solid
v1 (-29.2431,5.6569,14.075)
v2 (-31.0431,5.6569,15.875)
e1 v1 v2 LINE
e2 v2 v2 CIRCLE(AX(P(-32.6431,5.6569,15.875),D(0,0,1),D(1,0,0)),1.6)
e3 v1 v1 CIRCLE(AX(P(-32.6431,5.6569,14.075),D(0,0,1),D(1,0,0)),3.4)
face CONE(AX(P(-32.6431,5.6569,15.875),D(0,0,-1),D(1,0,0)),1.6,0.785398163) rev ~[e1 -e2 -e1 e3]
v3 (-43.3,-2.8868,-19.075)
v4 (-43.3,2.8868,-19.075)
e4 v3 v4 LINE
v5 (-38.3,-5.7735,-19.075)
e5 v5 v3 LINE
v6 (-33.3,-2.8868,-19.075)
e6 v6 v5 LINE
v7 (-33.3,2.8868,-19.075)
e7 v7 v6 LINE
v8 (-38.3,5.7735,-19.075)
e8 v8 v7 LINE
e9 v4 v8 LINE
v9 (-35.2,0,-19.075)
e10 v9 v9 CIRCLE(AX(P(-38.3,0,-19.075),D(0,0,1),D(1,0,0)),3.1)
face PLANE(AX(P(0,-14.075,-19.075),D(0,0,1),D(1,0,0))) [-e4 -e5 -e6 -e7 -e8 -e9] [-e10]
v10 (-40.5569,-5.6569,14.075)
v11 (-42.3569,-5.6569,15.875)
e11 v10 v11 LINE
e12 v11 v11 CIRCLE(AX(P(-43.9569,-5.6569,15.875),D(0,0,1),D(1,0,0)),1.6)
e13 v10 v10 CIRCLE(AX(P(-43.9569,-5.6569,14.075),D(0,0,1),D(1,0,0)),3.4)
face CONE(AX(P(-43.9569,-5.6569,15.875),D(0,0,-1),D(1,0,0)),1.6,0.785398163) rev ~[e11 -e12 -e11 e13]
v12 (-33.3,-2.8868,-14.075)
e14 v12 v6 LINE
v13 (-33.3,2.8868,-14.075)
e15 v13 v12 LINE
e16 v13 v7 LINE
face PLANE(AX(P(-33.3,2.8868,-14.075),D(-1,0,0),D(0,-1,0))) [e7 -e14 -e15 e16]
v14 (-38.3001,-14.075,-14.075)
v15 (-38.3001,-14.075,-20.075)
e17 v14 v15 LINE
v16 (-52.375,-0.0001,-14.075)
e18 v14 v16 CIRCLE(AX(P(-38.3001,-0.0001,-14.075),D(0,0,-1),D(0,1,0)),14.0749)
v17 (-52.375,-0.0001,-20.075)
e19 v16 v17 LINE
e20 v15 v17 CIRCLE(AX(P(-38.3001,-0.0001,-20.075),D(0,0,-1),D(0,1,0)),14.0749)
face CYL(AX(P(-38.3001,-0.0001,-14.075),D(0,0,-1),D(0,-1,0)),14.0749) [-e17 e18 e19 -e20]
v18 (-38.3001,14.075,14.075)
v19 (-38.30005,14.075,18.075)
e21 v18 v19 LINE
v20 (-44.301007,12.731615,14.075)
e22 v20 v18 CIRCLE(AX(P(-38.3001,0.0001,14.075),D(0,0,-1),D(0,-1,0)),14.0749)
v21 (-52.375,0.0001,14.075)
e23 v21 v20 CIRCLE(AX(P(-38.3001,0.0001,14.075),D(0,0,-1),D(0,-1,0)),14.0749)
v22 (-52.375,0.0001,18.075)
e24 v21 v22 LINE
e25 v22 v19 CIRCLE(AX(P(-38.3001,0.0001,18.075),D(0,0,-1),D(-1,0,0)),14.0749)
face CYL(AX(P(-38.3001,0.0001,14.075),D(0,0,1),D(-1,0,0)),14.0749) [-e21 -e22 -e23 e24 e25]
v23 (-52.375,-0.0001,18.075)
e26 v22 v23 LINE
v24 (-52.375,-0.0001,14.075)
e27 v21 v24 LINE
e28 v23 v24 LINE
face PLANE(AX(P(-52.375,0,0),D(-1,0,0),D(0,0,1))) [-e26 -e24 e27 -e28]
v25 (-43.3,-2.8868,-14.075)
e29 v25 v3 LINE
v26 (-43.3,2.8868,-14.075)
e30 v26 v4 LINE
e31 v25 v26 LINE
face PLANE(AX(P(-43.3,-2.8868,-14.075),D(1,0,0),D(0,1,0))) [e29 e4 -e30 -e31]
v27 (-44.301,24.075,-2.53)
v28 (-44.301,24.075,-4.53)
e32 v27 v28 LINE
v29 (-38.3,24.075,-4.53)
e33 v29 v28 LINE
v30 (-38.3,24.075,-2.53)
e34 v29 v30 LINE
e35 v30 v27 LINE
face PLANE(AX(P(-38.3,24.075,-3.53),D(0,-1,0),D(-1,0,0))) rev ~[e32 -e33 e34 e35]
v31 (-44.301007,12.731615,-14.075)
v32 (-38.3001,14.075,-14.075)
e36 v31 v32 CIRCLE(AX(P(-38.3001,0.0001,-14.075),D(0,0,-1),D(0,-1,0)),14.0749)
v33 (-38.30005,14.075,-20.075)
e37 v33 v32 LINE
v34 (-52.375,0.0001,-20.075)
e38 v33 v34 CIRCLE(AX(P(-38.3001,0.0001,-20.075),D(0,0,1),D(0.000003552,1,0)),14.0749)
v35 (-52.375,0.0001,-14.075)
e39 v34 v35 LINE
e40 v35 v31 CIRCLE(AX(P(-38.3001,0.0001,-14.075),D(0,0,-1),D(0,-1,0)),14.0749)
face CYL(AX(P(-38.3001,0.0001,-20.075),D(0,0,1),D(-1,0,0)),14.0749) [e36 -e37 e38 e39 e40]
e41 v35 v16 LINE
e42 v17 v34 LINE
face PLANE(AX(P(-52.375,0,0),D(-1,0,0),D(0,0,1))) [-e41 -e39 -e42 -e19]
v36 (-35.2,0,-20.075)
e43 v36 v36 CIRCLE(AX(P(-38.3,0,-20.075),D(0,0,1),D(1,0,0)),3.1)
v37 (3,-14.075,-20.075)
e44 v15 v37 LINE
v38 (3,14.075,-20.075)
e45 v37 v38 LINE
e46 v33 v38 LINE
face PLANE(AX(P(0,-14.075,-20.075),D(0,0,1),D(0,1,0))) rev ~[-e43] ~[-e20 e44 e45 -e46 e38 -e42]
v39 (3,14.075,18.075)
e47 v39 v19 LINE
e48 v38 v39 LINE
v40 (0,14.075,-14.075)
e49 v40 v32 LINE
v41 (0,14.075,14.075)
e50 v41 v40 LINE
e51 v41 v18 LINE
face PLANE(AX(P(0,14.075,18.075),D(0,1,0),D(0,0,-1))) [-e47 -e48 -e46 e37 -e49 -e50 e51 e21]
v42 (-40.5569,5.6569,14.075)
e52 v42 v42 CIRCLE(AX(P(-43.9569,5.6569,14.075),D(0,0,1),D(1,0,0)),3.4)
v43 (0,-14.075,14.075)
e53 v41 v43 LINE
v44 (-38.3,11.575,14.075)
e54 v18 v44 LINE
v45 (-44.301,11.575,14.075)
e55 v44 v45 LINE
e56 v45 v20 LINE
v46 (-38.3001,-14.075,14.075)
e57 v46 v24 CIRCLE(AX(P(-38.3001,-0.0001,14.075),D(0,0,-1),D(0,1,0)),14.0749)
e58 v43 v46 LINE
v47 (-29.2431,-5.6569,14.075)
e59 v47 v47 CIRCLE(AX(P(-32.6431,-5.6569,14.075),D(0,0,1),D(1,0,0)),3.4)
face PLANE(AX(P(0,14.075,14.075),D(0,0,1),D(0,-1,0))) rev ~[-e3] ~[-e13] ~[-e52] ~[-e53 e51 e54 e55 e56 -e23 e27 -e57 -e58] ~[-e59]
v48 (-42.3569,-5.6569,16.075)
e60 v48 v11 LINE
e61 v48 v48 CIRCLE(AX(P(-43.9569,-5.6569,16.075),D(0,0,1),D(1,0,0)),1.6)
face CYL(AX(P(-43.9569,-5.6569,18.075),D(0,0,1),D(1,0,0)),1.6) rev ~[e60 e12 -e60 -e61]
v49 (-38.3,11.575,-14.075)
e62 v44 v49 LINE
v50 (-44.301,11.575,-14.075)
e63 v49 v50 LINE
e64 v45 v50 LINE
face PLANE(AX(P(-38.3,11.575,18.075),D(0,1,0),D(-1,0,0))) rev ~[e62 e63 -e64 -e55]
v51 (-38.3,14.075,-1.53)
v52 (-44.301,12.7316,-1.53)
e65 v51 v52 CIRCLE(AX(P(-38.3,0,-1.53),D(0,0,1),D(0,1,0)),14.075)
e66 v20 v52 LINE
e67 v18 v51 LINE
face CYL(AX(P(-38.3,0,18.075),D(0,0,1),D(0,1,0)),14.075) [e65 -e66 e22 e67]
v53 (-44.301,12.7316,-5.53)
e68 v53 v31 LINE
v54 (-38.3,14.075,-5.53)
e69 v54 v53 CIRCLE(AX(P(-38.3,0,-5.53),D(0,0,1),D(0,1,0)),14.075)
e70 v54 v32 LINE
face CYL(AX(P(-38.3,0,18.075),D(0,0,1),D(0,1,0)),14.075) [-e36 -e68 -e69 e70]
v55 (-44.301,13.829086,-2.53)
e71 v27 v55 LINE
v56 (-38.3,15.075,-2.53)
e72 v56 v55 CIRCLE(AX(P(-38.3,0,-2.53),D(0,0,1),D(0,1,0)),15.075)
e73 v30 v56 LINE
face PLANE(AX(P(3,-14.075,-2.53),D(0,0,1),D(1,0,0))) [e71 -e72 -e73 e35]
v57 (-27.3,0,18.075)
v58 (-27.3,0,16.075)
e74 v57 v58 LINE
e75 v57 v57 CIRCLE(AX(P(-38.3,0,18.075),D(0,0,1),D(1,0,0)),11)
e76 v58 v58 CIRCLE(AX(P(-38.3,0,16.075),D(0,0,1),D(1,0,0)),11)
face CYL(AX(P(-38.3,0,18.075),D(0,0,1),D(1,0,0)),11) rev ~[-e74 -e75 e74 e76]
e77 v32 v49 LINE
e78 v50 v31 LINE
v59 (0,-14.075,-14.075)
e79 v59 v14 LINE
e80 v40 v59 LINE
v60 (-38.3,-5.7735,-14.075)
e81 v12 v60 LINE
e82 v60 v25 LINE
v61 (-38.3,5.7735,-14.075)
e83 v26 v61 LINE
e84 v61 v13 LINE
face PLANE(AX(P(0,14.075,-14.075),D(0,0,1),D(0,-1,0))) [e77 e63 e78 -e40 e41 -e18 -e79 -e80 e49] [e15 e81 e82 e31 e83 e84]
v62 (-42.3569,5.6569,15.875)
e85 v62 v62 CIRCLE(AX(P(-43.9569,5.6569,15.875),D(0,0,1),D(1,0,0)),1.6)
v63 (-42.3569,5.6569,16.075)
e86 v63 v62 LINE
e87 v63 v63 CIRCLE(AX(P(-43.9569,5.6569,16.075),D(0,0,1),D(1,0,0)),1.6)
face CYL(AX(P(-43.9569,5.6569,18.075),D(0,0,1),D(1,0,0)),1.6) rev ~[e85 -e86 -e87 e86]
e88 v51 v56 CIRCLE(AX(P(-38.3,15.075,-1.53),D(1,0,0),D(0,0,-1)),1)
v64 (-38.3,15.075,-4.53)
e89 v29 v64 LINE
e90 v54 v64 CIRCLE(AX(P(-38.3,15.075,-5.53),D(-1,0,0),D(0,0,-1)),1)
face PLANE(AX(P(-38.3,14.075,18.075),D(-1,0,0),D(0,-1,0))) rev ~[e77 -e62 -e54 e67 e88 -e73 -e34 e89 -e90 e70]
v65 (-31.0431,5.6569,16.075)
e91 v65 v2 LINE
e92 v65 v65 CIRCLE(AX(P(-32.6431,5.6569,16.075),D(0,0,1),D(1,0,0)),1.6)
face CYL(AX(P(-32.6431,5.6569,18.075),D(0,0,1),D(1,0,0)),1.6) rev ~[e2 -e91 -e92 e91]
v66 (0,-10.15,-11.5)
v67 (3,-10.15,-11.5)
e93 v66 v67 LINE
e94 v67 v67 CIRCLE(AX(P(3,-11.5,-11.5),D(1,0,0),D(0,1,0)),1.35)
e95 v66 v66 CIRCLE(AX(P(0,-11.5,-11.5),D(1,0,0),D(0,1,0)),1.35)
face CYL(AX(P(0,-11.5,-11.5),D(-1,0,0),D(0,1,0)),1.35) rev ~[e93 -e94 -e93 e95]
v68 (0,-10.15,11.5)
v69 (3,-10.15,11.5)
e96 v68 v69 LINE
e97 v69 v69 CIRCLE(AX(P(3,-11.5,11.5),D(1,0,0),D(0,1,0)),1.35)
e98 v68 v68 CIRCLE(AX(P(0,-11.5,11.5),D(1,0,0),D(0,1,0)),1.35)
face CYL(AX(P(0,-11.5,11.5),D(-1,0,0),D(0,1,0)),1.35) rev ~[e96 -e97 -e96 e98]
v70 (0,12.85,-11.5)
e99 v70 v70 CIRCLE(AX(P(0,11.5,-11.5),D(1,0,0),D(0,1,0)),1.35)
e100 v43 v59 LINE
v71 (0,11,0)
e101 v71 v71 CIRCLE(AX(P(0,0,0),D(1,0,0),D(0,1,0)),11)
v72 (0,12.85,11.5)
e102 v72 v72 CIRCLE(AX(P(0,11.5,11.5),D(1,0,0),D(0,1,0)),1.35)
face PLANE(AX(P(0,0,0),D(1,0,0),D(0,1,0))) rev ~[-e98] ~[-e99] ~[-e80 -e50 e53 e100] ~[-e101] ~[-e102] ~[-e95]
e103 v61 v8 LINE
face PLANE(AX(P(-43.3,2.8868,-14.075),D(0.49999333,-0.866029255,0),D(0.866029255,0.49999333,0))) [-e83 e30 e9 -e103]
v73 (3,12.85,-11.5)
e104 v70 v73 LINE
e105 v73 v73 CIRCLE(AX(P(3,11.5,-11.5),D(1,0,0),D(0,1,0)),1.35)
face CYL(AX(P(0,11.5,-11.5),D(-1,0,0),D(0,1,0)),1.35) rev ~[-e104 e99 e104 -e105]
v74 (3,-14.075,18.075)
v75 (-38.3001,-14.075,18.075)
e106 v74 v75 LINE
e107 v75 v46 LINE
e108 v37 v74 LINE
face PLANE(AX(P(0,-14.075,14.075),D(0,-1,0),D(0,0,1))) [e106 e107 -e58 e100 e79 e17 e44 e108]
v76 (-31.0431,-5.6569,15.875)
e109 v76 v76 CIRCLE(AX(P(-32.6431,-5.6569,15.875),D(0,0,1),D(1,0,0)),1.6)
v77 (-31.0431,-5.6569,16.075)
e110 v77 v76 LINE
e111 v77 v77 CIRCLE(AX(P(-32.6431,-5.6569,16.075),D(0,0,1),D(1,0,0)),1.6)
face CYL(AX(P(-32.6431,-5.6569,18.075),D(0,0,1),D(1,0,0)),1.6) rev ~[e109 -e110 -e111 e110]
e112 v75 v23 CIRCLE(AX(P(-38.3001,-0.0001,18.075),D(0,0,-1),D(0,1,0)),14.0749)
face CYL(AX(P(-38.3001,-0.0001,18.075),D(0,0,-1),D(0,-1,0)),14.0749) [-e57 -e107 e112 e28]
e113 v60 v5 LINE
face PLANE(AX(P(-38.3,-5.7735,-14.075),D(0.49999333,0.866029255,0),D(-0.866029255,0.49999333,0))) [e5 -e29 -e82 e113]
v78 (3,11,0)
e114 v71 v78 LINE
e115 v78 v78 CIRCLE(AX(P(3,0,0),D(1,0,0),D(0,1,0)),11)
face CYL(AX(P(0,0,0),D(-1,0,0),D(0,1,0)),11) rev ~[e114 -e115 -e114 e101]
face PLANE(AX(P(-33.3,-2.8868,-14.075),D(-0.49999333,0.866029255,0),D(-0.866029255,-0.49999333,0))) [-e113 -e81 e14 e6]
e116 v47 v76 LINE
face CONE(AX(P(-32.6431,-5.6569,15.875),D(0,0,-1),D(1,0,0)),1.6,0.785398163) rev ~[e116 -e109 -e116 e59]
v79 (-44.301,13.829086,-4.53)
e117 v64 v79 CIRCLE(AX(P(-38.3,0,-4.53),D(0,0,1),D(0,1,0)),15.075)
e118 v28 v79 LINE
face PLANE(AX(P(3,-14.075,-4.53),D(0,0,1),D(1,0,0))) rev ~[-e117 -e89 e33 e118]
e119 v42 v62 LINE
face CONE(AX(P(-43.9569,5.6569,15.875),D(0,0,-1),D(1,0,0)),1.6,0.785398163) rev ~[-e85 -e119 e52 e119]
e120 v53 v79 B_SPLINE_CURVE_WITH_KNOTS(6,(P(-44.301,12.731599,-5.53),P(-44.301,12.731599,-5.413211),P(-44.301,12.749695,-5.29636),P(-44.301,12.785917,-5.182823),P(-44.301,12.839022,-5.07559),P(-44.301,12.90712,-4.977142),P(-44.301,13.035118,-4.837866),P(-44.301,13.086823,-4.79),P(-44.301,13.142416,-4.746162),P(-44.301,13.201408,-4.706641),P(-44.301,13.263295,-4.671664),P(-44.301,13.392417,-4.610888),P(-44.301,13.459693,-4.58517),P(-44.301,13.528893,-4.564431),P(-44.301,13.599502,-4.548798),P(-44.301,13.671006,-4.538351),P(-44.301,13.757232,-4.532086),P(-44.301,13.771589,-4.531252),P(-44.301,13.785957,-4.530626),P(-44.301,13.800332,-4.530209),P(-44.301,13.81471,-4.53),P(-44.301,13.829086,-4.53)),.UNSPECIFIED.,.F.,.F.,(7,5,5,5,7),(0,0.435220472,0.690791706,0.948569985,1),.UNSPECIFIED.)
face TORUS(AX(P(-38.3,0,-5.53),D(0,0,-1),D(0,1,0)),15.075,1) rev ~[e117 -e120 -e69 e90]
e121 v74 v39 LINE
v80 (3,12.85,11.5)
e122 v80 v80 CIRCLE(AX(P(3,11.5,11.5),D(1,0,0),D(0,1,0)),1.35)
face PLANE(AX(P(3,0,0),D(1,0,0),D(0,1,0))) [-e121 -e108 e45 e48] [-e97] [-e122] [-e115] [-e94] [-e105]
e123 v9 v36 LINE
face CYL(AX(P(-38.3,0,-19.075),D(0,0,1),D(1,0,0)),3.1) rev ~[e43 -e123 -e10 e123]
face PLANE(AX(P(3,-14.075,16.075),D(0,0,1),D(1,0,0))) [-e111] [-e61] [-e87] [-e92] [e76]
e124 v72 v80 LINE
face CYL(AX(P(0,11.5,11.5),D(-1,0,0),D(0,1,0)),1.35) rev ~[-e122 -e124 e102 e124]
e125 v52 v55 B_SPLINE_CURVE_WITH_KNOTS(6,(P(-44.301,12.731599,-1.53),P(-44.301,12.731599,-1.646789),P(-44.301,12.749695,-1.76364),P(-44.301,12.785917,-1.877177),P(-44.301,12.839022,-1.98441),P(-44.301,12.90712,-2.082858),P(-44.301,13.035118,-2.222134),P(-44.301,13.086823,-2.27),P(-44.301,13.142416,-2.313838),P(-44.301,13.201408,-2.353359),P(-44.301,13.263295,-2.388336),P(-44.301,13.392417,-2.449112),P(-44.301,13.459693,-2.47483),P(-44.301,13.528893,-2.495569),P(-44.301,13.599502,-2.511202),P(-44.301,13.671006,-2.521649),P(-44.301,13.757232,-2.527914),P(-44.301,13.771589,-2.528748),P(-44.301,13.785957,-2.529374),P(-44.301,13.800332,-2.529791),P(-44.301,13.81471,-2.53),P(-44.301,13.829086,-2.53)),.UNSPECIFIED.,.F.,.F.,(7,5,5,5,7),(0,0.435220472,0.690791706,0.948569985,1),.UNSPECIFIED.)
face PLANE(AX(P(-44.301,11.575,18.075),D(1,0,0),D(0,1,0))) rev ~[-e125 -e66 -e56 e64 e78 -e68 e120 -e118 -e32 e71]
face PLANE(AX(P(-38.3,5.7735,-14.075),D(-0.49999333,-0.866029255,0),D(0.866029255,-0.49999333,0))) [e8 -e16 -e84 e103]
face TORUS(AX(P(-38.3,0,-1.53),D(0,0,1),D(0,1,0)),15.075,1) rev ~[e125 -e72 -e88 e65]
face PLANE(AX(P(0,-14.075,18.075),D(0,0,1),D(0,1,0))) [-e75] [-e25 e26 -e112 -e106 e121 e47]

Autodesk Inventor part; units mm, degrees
ref_plane "YZ Plane" through (0, 0, 0) normal (1, 0, 0) x (0, 1, 0)
ref_plane "XZ Plane" through (0, 0, 0) normal (0, 1, 0) x (-1, 0, 0)
sketch "草圖1" plane through (0, 0, 0) normal (1, 0, 0) x (0, 1, 0)
  line L0 (-14.075, 14.075) -> (14.075, 14.075)
  line L1 (14.075, 14.075) -> (14.075, -14.075)
  line L2 (14.075, -14.075) -> (-14.075, -14.075)
  line L3 (-14.075, -14.075) -> (-14.075, 14.075)
  line L4 (-14.075, 14.075) -> (14.075, -14.075) construction
  line L5 (14.075, 14.075) -> (-14.075, -14.075) construction
  line L6 (14.075, 14.075) -> (-14.075, 14.075)
  line L7 (-14.075, 14.075) -> (-14.075, 18.075)
  line L8 (-14.075, 18.075) -> (14.075, 18.075)
  line L9 (14.075, 18.075) -> (14.075, 14.075)
  circle A0 centre (0, 0) radius 11
  line L10 (-11.5, 11.5) -> (11.5, 11.5) construction
  line L11 (11.5, 11.5) -> (11.5, -11.5) construction
  line L12 (11.5, -11.5) -> (-11.5, -11.5) construction
  line L13 (-11.5, -11.5) -> (-11.5, 11.5) construction
  line L14 (-11.5, 11.5) -> (11.5, -11.5) construction
  line L15 (11.5, 11.5) -> (-11.5, -11.5) construction
  circle A1 centre (11.5, 11.5) radius 1.35
  circle A2 centre (-11.5, 11.5) radius 1.35
  circle A3 centre (-11.5, -11.5) radius 1.35
  circle A4 centre (11.5, -11.5) radius 1.35
  line L16 (14.075, -14.075) -> (-14.075, -14.075)
  line L17 (-14.075, -14.075) -> (-14.075, -20.075)
  line L18 (-14.075, -20.075) -> (14.075, -20.075)
  line L19 (14.075, -20.075) -> (14.075, -14.075)
  dimension "d0" = 28.15
  dimension "d1" = 28.15
  dimension "d2" = 4
  dimension "d3" = 22
  dimension "d4" = 23
  dimension "d5" = 23
  dimension "d6" = 2.7
  dimension "d9" = 360
  dimension "d11" = 6
extrude "擠出1" add sketch "草圖1" along normal blind 3
sketch "草圖2" plane through (0, 0, 0) normal (-1, 0, 0) x (0, 0, 1)
  line L0 (18.075, 14.075) -> (18.075, -14.075) projected
  line L1 (-20.075, 14.075) -> (18.075, 14.075) projected
  line L2 (-20.075, -14.075) -> (-20.075, 14.075) projected
  line L3 (18.075, -14.075) -> (-20.075, -14.075) projected
  circle A0 centre (0, 0) radius 11 projected
  circle A1 centre (11.5, 11.5) radius 1.35 projected
  circle A2 centre (11.5, -11.5) radius 1.35 projected
  circle A3 centre (-11.5, -11.5) radius 1.35 projected
  circle A4 centre (-11.5, 11.5) radius 1.35 projected
  line L4 (-14.075, 14.075) -> (-14.075, -14.075)
  line L5 (14.075, 14.075) -> (14.075, -14.075)
  dimension "d14" = 6
  dimension "d15" = 4
extrude "擠出2" add sketch "草圖2" along normal blind 52.375 contours L0 L3 L5 L1 | L4 L3 L2 L1
sketch "草圖3" plane through (3, -14.075, 18.075) normal (0, 0, 1) x (1, 0, 0)
  line L0 (-55.375, 0) -> (0, 0) projected
  line L1 (0, 28.15) -> (0, 0) projected
  line L2 (0, 28.15) -> (-55.375, 28.15) projected
  line L3 (-55.375, 0) -> (-55.375, 28.15) projected
  circle A0 centre (-41.3, 14.075) radius 11
  line L4 (-55.375, 0) -> (-55.375, 28.15) projected
  circle A1 centre (-41.3, 14.075) radius 8 construction
  line L5 (-41.3, 14.075) -> (-33.5218, 21.8532) construction
  line L6 (-41.3, 14.075) -> (-30.3, 14.075) construction
  circle A2 centre (-35.6431, 19.7319) radius 1.6
  circle A3 centre (-46.9569, 19.7319) radius 1.6
  circle A4 centre (-46.9569, 8.4181) radius 1.6
  circle A5 centre (-35.6431, 8.4181) radius 1.6
  point P0 (-3, 14.075)
  dimension "d18" = 22
  dimension "d19" = 16
  dimension "d65" = 10
  dimension "d20" = 45
  dimension "d21" = 3.2
  dimension "d24" = 360
  dimension "d30" = 14.075
  dimension "d31" = 14.075
extrude "擠出3" cut sketch "草圖3" against normal up to surface (4 mm away) contours A2 | A3 | A4 | A5
extrude "擠出4" cut sketch "草圖3" against normal blind 2 contours A0
fillet "圓角1" radius 14.075 4 edges at (-52.375, 14.075, 16.075) (-52.375, 14.075, -17.075) (-52.375, -14.075, 16.075) (-52.375, -14.075, -17.075)
sketch "草圖4" plane through (0, -14.075, -14.075) normal (0, 0, 1) x (1, 0, 0)
  circle A0 centre (-38.3, 14.075) radius 11 projected
  line L0 (-38.3, 8.3015) -> (-43.3, 11.1882)
  line L1 (-43.3, 11.1882) -> (-43.3, 16.9618)
  line L2 (-43.3, 16.9618) -> (-38.3, 19.8485)
  line L3 (-38.3, 19.8485) -> (-33.3, 16.9618)
  line L4 (-33.3, 16.9618) -> (-33.3, 11.1882)
  line L5 (-33.3, 11.1882) -> (-38.3, 8.3015)
  point P0 (0, 14.075)
  dimension "d33" = 10
extrude "擠出5" cut sketch "草圖4" against normal blind 5 contours L0 L1 L2 L3 L4 L5
sketch "草圖5" plane through (0, -14.075, -19.075) normal (0, 0, 1) x (1, 0, 0)
  circle A0 centre (-38.3, 14.075) radius 11 projected
  circle A1 centre (-38.3, 14.075) radius 3.1
  point P0 (0, 14.075)
  dimension "d36" = 6.2
extrude "擠出6" cut sketch "草圖5" against normal up to surface (1 mm away) contours A1
sketch "草圖7" plane through (3, 0, 0) normal (1, 0, 0) x (0, 0, -1)
  line L0 (-18.075, 14.075) -> (-18.075, -14.075) projected
  line L1 (-18.075, -14.075) -> (20.075, -14.075) projected
  line L2 (20.075, -14.075) -> (20.075, 14.075) projected
  line L3 (20.075, 14.075) -> (-18.075, 14.075) projected
  circle A0 centre (0, 0) radius 11 projected
  circle A1 centre (-11.5, 11.5) radius 1.35 projected
  circle A2 centre (-11.5, -11.5) radius 1.35 projected
  circle A3 centre (11.5, -11.5) radius 1.35 projected
  circle A4 centre (11.5, 11.5) radius 1.35 projected
  line L4 (-2.75, 14.075) -> (-2.75, 10.6507)
  line L5 (2.75, 14.075) -> (2.75, 10.6507)
  dimension "d44" = 5.5
  dimension "d45" = 2.75
chamfer "倒角1" distance 1.8 angle 45 4 edges at (-45.5569, -5.6569, 14.075) (-45.5569, 5.6569, 14.075) (-34.2431, -5.6569, 14.075) (-34.2431, 5.6569, 14.075)
sketch "草圖11" plane through (3, -14.075, 18.075) normal (0, 0, 1) x (1, 0, 0)
  line L0 (-37.3248, 33.6873) -> (-37.3375, 43.4872) projected
  line L1 (-37.3248, 33.6873) -> (-31.2248, 33.6951) projected
  line L2 (-31.2375, 43.4951) -> (-31.2248, 33.6951) projected
  line L3 (-37.3375, 43.4872) -> (-31.2375, 43.4951) projected
  arc A0 (-41.3, 28.15) -> (-41.3, 0) centre (-41.3, 14.075) ccw projected
  line L4 (-41.3, 0) -> (0, 0) projected
  line L5 (0, 28.15) -> (0, 0) projected
  line L6 (0, 28.15) -> (-41.3, 28.15) projected
  circle A1 centre (-41.3, 14.075) radius 11 projected
  line L7 (-31.2003, 28.15) -> (-31.2003, 25.65)
  line L8 (-31.2003, 25.65) -> (-47.301, 25.65)
  line L9 (-47.301, 25.65) -> (-47.301, 26.8066)
  line L10 (-41.3, 28.15) -> (-41.3, 25.65)
  point P0 (-3, 14.075)
  dimension "d64" = 2.5
extrude "擠出12" add sketch "草圖11" against normal up to surface (38.15 mm away) contours L10 L8 L9 A0
ref_plane "工作平面4" through (3, -14.075, -3.53) normal (0, 0, 1) x (1, 0, 0)
sketch "草圖15" plane through (3, -14.075, -3.53) normal (0, 0, 1) x (1, 0, 0)
  line L0 (0, 28.15) -> (-41.3, 28.15) projected
  arc A0 (-41.3, 28.15) -> (-41.3, 0) centre (-41.3, 14.075) ccw projected
  line L1 (-47.3274, 33.6866) -> (-47.3385, 41.6466) construction
  line L2 (-47.3274, 33.6866) -> (-41.2274, 33.6951) construction
  line L3 (-41.2385, 41.6551) -> (-41.2274, 33.6951) construction
  line L4 (-47.3385, 41.6466) -> (-41.2385, 41.6551) construction
  line L5 (-41.3, 38.15) -> (-47.301, 38.15)
  line L6 (-41.3, 38.15) -> (-41.3, 28.15)
  line L7 (-47.301, 38.15) -> (-47.301, 26.8066)
  point P0 (-3, 14.075)
  point P1 (-47.301, 26.8066)
  dimension "d78" = 10
extrude "擠出16" add sketch "草圖15" along normal mid plane 2
fillet "圓角5" radius 1 2 edges at (-41.3748, 13.735, -4.53) (-41.3748, 13.735, -2.53)
equation "\"d31\" = d30"
equation "\"d26\" = d19"
equation "\"d45\" = 0.5 * d44"
properties part number "j6 motor mount v2_3D 列印"
